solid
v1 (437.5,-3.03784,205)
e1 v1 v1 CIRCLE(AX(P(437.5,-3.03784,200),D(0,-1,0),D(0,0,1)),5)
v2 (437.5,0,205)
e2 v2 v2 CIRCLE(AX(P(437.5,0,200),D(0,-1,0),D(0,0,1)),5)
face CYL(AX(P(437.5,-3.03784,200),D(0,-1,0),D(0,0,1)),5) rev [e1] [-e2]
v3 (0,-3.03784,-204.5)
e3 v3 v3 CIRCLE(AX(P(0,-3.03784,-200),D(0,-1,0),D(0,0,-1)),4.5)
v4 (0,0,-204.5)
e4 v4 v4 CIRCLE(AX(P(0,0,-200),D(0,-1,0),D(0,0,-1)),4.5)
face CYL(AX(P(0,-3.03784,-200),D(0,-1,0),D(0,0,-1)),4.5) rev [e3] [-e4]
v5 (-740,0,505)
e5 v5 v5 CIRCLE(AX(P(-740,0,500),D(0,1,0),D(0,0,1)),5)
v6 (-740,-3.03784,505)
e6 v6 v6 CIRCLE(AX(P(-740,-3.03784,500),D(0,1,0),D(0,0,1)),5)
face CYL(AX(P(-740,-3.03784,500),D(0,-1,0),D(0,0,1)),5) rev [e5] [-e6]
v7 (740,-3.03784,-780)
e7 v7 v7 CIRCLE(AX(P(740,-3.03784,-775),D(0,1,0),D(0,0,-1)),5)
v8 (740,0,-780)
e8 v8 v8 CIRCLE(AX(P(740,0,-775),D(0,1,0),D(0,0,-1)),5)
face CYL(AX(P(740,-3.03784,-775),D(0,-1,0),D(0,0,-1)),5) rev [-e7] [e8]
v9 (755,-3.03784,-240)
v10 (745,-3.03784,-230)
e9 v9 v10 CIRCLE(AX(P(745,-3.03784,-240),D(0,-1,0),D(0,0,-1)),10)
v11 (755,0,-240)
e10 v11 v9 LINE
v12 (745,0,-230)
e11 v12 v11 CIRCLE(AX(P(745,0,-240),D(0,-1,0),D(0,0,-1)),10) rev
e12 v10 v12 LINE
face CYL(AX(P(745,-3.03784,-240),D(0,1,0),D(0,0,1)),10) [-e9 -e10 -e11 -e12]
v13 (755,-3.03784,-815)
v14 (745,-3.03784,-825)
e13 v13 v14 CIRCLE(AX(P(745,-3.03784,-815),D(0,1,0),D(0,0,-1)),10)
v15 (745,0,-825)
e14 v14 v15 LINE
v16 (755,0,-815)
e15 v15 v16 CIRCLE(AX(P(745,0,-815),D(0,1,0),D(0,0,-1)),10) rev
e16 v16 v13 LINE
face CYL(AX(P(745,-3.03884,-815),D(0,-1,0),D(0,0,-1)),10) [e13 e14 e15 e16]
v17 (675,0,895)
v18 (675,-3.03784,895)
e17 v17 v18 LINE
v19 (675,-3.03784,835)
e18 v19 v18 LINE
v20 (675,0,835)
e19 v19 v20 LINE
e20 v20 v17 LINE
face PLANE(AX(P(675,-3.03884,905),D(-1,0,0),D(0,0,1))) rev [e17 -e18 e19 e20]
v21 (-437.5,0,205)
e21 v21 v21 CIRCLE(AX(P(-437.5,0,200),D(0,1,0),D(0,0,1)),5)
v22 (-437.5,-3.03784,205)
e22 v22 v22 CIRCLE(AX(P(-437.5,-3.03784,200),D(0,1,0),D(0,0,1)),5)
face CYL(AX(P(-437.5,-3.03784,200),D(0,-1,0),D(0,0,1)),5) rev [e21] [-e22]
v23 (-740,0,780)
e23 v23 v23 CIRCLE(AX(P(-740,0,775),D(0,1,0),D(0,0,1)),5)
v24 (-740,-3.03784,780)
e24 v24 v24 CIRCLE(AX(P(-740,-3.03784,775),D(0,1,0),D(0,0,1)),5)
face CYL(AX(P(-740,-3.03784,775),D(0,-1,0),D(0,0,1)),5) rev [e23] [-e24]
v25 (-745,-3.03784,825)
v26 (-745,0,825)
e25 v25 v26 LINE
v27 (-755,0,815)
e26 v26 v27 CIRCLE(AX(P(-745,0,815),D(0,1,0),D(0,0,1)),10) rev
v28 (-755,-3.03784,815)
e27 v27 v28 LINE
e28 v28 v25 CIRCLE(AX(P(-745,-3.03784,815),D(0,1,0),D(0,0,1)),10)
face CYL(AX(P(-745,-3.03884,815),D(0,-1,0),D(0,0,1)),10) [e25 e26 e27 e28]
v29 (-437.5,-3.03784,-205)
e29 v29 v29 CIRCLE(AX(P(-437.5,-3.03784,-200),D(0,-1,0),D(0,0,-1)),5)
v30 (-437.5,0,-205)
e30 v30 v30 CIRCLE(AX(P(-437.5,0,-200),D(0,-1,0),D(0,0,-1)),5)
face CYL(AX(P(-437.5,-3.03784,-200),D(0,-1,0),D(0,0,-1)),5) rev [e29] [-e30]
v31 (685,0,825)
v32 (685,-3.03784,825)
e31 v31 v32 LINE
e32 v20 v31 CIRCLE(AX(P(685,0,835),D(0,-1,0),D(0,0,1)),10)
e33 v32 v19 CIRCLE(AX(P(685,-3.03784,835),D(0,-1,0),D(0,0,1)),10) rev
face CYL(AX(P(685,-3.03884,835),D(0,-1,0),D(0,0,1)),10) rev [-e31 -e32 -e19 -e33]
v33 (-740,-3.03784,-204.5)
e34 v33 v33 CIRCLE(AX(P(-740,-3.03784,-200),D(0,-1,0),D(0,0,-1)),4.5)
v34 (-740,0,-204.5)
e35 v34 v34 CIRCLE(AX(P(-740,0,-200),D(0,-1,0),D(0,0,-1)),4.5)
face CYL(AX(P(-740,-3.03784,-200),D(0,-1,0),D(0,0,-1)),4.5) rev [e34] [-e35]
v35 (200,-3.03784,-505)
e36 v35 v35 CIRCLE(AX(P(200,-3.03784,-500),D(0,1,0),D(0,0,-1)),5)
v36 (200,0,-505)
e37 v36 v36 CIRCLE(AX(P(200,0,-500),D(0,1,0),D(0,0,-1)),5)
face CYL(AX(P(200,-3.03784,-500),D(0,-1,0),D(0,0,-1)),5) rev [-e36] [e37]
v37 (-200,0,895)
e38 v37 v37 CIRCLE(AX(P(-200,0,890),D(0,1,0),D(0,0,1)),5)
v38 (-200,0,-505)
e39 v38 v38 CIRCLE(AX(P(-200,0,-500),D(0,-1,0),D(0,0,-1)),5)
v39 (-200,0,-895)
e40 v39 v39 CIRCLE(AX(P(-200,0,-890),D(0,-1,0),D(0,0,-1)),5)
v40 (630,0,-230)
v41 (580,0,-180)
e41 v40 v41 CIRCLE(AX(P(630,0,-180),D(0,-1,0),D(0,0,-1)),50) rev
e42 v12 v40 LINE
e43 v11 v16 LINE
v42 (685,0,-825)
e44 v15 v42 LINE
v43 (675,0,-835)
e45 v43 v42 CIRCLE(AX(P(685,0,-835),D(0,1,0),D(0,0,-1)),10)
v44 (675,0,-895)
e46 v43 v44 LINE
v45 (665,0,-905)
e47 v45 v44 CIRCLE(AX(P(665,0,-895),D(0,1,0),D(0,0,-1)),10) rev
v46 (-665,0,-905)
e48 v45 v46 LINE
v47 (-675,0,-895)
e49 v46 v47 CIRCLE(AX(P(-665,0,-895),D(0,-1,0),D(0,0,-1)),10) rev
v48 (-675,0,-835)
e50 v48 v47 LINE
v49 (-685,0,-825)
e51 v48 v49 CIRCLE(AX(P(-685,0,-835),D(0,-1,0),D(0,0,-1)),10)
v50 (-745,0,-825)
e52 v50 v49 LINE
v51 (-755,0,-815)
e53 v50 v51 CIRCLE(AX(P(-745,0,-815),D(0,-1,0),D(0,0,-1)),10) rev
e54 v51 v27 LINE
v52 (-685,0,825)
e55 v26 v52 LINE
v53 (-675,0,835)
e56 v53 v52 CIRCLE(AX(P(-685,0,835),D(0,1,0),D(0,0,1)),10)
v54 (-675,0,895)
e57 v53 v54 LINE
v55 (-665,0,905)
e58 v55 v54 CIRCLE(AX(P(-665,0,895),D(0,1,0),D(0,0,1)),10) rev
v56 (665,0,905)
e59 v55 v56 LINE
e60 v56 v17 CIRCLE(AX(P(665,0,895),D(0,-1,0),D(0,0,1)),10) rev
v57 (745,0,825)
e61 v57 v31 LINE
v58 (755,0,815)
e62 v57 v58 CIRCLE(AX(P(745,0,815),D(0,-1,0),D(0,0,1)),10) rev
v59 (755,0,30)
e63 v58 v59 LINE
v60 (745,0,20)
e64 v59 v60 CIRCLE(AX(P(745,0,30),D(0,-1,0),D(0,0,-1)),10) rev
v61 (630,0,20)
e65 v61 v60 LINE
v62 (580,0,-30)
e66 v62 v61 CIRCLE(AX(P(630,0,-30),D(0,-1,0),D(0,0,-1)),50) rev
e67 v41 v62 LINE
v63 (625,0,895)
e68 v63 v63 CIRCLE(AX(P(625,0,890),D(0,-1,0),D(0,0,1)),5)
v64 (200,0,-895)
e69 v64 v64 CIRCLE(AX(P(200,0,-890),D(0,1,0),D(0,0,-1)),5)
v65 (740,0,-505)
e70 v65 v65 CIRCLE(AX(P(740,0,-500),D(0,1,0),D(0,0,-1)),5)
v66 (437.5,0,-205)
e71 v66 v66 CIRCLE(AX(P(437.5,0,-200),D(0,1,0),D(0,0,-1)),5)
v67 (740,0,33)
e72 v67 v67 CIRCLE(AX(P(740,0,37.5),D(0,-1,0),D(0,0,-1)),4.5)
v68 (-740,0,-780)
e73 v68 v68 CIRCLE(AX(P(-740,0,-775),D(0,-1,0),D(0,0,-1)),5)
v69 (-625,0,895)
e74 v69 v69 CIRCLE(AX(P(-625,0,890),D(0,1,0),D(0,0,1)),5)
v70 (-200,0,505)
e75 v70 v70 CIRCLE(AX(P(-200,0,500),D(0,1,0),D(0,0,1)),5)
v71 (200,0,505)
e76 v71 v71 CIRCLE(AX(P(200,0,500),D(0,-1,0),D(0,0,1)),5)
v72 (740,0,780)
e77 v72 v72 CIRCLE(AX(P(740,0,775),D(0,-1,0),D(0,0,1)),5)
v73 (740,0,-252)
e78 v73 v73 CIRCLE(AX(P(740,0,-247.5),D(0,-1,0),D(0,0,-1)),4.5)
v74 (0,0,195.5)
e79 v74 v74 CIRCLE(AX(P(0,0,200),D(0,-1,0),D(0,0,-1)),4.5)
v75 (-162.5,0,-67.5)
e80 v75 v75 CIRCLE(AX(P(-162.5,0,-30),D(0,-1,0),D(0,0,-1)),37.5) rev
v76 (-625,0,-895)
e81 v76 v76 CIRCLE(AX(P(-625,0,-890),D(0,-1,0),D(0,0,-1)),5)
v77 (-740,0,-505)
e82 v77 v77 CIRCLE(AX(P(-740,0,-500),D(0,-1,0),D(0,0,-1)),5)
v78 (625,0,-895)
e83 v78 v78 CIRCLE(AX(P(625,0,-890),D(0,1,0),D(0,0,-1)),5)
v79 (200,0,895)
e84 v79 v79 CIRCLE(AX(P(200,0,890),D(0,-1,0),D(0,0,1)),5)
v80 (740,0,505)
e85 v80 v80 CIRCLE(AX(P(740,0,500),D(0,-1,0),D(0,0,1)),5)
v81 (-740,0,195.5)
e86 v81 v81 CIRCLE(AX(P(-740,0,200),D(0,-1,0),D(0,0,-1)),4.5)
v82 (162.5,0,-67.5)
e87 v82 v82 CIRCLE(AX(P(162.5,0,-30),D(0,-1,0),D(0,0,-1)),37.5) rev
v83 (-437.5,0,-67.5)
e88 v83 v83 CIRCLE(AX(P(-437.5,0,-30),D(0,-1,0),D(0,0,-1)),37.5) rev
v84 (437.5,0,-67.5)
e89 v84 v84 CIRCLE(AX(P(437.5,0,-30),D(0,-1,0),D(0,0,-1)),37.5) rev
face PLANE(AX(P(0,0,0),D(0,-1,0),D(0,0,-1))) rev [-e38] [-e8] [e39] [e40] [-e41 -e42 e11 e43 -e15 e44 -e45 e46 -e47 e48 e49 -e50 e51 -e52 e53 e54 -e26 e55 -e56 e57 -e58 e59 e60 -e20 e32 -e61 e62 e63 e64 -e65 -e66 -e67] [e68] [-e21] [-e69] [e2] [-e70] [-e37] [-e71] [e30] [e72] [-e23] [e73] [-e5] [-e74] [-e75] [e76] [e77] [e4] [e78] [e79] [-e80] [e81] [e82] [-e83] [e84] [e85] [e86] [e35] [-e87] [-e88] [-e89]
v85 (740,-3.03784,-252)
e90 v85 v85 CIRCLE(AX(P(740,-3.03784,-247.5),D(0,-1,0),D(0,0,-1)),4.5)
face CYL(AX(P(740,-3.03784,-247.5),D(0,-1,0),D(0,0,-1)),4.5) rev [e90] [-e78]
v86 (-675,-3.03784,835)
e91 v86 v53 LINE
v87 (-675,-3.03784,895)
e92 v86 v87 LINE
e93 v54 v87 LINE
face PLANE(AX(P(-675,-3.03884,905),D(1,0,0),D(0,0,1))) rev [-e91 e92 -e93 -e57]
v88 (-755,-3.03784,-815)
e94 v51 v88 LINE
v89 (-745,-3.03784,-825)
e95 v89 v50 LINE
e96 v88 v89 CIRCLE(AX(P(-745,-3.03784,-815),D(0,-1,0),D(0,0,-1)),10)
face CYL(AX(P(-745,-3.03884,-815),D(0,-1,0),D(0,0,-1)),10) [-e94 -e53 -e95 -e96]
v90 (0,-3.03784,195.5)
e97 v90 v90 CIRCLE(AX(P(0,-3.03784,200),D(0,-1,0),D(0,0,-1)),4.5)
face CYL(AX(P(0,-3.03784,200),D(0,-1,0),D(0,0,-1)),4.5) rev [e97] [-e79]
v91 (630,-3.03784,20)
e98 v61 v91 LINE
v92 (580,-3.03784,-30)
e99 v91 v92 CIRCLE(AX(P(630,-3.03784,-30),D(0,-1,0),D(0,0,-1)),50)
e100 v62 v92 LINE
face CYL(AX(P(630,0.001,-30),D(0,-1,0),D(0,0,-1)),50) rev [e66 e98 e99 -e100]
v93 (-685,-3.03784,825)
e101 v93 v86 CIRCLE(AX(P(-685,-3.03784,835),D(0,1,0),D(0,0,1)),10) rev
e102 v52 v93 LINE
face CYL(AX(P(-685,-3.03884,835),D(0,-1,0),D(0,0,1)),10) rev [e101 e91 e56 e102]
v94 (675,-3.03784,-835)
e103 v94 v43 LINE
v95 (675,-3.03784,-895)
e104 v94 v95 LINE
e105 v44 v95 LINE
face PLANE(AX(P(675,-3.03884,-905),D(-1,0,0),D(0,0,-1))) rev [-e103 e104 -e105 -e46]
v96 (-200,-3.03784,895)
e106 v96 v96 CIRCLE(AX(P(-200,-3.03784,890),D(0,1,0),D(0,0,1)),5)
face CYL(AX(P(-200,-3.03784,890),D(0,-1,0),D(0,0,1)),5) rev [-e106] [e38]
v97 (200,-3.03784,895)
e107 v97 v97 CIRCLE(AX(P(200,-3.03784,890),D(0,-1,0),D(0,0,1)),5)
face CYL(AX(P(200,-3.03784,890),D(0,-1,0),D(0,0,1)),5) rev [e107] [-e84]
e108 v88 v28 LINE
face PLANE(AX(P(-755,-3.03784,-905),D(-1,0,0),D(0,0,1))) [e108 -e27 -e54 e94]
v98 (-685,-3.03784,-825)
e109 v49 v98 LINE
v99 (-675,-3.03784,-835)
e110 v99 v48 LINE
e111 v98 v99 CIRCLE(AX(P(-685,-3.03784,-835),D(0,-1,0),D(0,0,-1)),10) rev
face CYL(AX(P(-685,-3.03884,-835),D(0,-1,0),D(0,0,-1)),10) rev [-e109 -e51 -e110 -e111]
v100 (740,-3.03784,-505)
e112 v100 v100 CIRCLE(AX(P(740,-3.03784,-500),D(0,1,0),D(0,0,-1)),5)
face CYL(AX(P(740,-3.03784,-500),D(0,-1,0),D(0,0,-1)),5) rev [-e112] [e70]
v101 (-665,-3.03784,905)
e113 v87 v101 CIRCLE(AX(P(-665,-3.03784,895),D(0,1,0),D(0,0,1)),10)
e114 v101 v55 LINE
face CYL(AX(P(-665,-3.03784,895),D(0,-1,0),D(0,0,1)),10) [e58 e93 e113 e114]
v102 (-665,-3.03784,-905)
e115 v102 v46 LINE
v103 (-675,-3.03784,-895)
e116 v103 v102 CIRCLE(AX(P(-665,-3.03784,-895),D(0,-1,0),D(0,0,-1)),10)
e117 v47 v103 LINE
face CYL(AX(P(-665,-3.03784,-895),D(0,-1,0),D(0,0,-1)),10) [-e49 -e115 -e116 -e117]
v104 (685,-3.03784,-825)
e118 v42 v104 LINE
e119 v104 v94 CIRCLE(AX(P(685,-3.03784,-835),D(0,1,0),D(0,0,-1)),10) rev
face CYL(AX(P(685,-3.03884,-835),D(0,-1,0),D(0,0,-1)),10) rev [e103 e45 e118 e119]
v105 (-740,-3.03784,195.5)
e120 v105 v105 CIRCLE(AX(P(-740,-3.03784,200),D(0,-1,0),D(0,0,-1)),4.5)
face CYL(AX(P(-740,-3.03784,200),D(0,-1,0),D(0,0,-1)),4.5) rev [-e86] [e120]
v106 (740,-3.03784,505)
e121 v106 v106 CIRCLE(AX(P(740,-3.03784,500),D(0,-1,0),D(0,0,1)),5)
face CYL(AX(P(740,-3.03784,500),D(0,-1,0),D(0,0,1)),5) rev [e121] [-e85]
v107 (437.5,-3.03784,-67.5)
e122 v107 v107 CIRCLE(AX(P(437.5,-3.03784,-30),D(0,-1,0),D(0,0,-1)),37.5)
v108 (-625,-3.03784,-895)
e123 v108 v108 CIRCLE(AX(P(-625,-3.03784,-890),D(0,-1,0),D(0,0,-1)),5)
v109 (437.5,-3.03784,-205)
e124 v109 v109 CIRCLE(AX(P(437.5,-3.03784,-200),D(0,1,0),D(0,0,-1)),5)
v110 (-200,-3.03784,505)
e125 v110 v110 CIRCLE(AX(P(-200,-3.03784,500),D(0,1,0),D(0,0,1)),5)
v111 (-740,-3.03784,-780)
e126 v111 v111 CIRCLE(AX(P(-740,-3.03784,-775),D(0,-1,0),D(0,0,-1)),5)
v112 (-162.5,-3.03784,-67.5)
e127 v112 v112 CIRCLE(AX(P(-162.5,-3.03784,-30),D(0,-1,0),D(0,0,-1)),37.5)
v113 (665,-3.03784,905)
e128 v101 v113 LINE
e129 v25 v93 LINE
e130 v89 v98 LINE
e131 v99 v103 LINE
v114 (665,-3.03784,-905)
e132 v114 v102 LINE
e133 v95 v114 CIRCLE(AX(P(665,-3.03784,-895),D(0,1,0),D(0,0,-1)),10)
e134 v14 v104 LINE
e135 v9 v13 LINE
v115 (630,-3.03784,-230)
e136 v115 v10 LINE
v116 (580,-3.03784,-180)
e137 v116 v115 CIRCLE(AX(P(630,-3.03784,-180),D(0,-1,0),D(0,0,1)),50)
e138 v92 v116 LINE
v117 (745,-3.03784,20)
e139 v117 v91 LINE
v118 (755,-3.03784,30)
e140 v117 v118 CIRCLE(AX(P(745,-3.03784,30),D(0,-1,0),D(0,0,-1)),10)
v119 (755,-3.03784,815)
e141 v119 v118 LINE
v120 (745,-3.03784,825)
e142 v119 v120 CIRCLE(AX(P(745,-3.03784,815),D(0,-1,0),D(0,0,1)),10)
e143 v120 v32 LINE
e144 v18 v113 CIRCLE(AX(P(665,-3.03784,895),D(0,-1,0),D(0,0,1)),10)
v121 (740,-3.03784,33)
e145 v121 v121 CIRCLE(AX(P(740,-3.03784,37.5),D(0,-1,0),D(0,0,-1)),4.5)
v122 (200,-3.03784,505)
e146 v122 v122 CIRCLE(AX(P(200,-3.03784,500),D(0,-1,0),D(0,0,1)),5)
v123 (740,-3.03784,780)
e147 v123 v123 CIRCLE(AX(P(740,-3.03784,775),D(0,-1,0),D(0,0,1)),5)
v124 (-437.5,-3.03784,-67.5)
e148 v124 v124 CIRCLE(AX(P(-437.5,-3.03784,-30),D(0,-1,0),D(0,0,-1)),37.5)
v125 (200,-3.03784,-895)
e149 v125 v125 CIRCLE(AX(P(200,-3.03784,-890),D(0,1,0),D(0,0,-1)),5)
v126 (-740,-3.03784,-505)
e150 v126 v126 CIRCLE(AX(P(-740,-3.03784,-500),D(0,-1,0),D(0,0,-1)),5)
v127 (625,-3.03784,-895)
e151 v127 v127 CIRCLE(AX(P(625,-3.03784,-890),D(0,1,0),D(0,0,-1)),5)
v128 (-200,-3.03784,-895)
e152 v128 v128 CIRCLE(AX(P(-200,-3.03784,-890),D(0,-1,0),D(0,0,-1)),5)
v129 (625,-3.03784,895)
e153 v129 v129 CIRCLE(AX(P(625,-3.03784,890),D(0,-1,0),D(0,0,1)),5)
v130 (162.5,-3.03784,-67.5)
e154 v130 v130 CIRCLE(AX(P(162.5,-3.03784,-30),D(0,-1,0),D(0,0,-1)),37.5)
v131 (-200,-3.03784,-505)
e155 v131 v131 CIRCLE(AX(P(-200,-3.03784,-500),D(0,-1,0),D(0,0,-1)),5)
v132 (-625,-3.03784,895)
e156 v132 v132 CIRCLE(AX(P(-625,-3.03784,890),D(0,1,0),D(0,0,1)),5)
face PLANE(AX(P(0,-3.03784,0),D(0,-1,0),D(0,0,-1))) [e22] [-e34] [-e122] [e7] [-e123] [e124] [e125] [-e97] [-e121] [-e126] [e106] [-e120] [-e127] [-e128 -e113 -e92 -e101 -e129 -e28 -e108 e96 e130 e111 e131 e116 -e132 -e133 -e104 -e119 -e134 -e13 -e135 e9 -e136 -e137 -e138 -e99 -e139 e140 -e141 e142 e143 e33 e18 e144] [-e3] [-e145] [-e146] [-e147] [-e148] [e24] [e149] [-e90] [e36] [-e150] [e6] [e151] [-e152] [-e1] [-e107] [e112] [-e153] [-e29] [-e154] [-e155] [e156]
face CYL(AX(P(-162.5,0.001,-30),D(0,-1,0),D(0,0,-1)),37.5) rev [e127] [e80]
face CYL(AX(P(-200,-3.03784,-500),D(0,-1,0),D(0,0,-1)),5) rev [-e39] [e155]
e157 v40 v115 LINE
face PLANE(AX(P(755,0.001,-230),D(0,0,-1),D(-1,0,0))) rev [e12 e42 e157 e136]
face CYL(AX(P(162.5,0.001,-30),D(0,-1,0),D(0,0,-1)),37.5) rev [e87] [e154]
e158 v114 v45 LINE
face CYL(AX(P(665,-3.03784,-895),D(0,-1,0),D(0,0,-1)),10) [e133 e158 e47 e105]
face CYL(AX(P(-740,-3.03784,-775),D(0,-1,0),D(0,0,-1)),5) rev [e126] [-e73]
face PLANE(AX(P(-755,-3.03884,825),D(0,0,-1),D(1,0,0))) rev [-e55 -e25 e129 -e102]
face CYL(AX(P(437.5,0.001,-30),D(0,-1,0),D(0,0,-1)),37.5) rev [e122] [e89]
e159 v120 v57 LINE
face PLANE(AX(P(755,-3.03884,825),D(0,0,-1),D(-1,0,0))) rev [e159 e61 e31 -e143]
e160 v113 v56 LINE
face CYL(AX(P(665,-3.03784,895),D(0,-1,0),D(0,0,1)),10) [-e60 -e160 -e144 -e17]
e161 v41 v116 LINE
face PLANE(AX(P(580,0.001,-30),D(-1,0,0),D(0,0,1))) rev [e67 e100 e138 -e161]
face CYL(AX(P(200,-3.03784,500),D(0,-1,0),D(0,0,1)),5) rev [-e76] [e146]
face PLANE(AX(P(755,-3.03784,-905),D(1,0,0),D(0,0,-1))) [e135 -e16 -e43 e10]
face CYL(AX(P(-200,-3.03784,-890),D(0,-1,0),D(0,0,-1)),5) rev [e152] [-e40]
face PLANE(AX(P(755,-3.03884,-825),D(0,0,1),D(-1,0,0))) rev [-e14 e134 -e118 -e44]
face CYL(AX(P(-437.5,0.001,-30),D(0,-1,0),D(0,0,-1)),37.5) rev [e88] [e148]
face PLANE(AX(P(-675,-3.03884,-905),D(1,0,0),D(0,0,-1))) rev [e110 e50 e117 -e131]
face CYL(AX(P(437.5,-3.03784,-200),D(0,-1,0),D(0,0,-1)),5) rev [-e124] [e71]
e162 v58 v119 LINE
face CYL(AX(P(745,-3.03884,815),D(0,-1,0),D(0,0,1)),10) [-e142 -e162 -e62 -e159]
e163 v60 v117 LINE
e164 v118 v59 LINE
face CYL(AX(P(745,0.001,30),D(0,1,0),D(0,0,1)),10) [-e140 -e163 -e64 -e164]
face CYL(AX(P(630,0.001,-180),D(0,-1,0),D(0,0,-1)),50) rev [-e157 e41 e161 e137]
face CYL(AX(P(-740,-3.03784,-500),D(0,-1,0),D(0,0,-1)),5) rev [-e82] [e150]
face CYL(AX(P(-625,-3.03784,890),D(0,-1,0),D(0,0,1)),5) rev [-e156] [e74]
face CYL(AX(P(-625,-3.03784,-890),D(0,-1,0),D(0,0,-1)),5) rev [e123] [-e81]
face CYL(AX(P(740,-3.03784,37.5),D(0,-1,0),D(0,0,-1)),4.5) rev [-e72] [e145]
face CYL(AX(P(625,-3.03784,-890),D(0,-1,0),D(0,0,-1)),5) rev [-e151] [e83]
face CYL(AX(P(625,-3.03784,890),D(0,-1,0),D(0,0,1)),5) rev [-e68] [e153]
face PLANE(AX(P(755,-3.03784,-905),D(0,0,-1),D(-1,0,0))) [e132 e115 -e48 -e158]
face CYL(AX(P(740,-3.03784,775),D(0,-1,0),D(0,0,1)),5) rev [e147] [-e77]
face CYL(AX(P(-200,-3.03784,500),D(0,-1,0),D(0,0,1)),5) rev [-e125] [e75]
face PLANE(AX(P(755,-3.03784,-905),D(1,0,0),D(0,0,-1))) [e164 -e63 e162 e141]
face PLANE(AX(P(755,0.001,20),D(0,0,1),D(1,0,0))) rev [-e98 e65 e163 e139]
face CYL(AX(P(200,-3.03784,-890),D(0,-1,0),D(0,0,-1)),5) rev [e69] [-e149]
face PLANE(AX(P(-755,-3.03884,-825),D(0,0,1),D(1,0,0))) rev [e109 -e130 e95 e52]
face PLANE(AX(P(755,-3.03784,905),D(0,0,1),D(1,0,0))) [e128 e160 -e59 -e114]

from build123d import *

# Parameters (mm, degrees)
SKETCH1_W            = 1510
SKETCH1_H            = 1810
BASE_FLANGE1_DEPTH   = 3.03784
CUT_EXTRUDE1_REACH   = 1180.584
SKETCH6_W            = 80
SKETCH6_H            = 80
M8_CLEARANCE_HOLE1_D = 10
FILLET1_R            = 10
FILLET1_OF_MIRROR1_R = 10
MIRROR2_START        = -3.03784
MIRROR2_OUTLINE_R    = 5
MIRROR2_DEPTH        = 3.03784
CUT_EXTRUDE2_REACH   = 1180.584
SKETCH12_R           = 37.5
M8_CLEARANCE_HOLE2_D = 9
FILLET2_R            = 10


# Read off the part's stored shape, not the designer's step: Mirror2
# Sheet-metal steps are written as plain solids
with BuildPart() as part:
    # Sketch1 → Base-Flange1 (new body)
    with BuildSketch(Plane(origin=(0, 0, 0), x_dir=(1, 0, 0), z_dir=(0, 1, 0))):
        Rectangle(SKETCH1_W, SKETCH1_H)
    extrude(amount=-BASE_FLANGE1_DEPTH)

    # Sketch6 → Cut-Extrude1 (cut, up to next)
    with BuildSketch(Plane(origin=(0, 0, 0), x_dir=(1, 0, 0), z_dir=(0, 1, 0)), mode=Mode.PRIVATE) as cut_extrude1_sk1:
        with Locations((-715, 865)):
            Rectangle(SKETCH6_W, SKETCH6_H)
    cut_extrude1_tool1 = extrude(cut_extrude1_sk1.sketch, amount=-CUT_EXTRUDE1_REACH, mode=Mode.PRIVATE) & part.part
    cut_extrude1 = cut_extrude1_tool1.solids().sort_by_distance((-715, 0, -865))[0]
    add(cut_extrude1, mode=Mode.SUBTRACT)

    # M8 Clearance Hole1 (through all)
    with Locations(Plane(origin=(0, -3.03784, 0), x_dir=(-1, 0, 0), z_dir=(0, -1, 0))):
        with Locations((200, 890), (200, 500), (740, 500), (740, 775), (625, 890), (437.5, 200)):
            m8_clearance_hole1 = Hole(M8_CLEARANCE_HOLE1_D / 2)

    # Fillet1
    fillet1_edges = [part.edges().sort_by_distance(p)[0] for p in [
        (-755, -1.51892, -825),
        (-675, -1.51892, -905),
        (-675, -1.51892, -825),
    ]]
    fillet(fillet1_edges, radius=FILLET1_R)

    # Mirror1: Cut-Extrude1, M8 Clearance Hole1 across plane
    add(cut_extrude1.mirror(Plane.XY), mode=Mode.SUBTRACT)
    add(m8_clearance_hole1.mirror(Plane.XY), mode=Mode.SUBTRACT)

    # Fillet1 of Mirror1
    fillet1_of_mirror1_edges = [part.edges().sort_by_distance(p)[0] for p in [
        (-755, -1.51892, 825),
        (-675, -1.51892, 905),
        (-675, -1.51892, 825),
    ]]
    fillet(fillet1_of_mirror1_edges, radius=FILLET1_OF_MIRROR1_R)

    # Mirror2 outline → Mirror2 (cut)
    with BuildSketch(Plane(origin=(0, 0, 0), x_dir=(1, 0, 0), z_dir=(0, 1, 0)).offset(MIRROR2_START)):
        with BuildLine():
            ThreePointArc((675, 835), (677.928932188, 827.928932188), (685, 825))
            Line((685, 825), (745, 825))
            ThreePointArc((745, 825), (752.071067812, 822.071067812), (755, 815))
            Line((755, 815), (755, 905))
            Line((755, 905), (665, 905))
            ThreePointArc((665, 905), (672.071067812, 902.071067812), (675, 895))
            Line((675, 895), (675, 835))
        make_face()
        with BuildLine():
            Line((755, -905), (755, -815))
            ThreePointArc((755, -815), (752.071067812, -822.071067812), (745, -825))
            Line((745, -825), (685, -825))
            ThreePointArc((685, -825), (677.928932188, -827.928932188), (675, -835))
            Line((675, -835), (675, -895))
            ThreePointArc((675, -895), (672.071067812, -902.071067812), (665, -905))
            Line((665, -905), (755, -905))
        make_face()
        with Locations((200, -890)):
            Circle(MIRROR2_OUTLINE_R)
        with Locations((200, 890)):
            Circle(MIRROR2_OUTLINE_R)
        with Locations((437.5, -200)):
            Circle(MIRROR2_OUTLINE_R)
        with Locations((437.5, 200)):
            Circle(MIRROR2_OUTLINE_R)
        with Locations((625, -890)):
            Circle(MIRROR2_OUTLINE_R)
        with Locations((625, 890)):
            Circle(MIRROR2_OUTLINE_R)
        with Locations((740, -775)):
            Circle(MIRROR2_OUTLINE_R)
        with Locations((740, 775)):
            Circle(MIRROR2_OUTLINE_R)
        with Locations((740, -500)):
            Circle(MIRROR2_OUTLINE_R)
        with Locations((740, 500)):
            Circle(MIRROR2_OUTLINE_R)
        with Locations((200, -500)):
            Circle(MIRROR2_OUTLINE_R)
        with Locations((200, 500)):
            Circle(MIRROR2_OUTLINE_R)
    extrude(amount=MIRROR2_DEPTH, mode=Mode.SUBTRACT)

    # Sketch12 → Cut-Extrude2 (cut, up to next)
    with BuildSketch(Plane.XZ.offset(3.03784), mode=Mode.PRIVATE) as cut_extrude2_sk1:
        with Locations(Location((-437.5, -30, 0), (0, 0, 270))):
            Circle(SKETCH12_R)
    cut_extrude2_tool1 = extrude(cut_extrude2_sk1.sketch, amount=-CUT_EXTRUDE2_REACH, mode=Mode.PRIVATE) & part.part
    # Sketch12 → Cut-Extrude2 (cut, up to next)
    with BuildSketch(Plane.XZ.offset(3.03784), mode=Mode.PRIVATE) as cut_extrude2_sk2:
        with Locations(Location((-162.5, -30, 0), (0, 0, 270))):
            Circle(SKETCH12_R)
    cut_extrude2_tool2 = extrude(cut_extrude2_sk2.sketch, amount=-CUT_EXTRUDE2_REACH, mode=Mode.PRIVATE) & part.part
    # Sketch12 → Cut-Extrude2 (cut, up to next)
    with BuildSketch(Plane.XZ.offset(3.03784), mode=Mode.PRIVATE) as cut_extrude2_sk3:
        with Locations(Location((162.5, -30, 0), (0, 0, 270))):
            Circle(SKETCH12_R)
    cut_extrude2_tool3 = extrude(cut_extrude2_sk3.sketch, amount=-CUT_EXTRUDE2_REACH, mode=Mode.PRIVATE) & part.part
    # Sketch12 → Cut-Extrude2 (cut, up to next)
    with BuildSketch(Plane.XZ.offset(3.03784), mode=Mode.PRIVATE) as cut_extrude2_sk4:
        with Locations(Location((437.5, -30, 0), (0, 0, 270))):
            Circle(SKETCH12_R)
    cut_extrude2_tool4 = extrude(cut_extrude2_sk4.sketch, amount=-CUT_EXTRUDE2_REACH, mode=Mode.PRIVATE) & part.part
    # Sketch12 → Cut-Extrude2 (cut, up to next)
    with BuildSketch(Plane.XZ.offset(3.03784), mode=Mode.PRIVATE) as cut_extrude2_sk5:
        with BuildLine():
            Line((755, 20), (630, 20))
            ThreePointArc((630, 20), (594.644660941, 5.355339059), (580, -30))
            Line((580, -30), (580, -180))
            ThreePointArc((580, -180), (594.644660941, -215.355339059), (630, -230))
            Line((630, -230), (755, -230))
            Line((755, -230), (755, 20))
        make_face()
    cut_extrude2_tool5 = extrude(cut_extrude2_sk5.sketch, amount=-CUT_EXTRUDE2_REACH, mode=Mode.PRIVATE) & part.part
    add(cut_extrude2_tool1.solids().sort_by_distance((-437.5, -3.03784, -30))[0], mode=Mode.SUBTRACT)
    add(cut_extrude2_tool2.solids().sort_by_distance((-162.5, -3.03784, -30))[0], mode=Mode.SUBTRACT)
    add(cut_extrude2_tool3.solids().sort_by_distance((162.5, -3.03784, -30))[0], mode=Mode.SUBTRACT)
    add(cut_extrude2_tool4.solids().sort_by_distance((437.5, -3.03784, -30))[0], mode=Mode.SUBTRACT)
    add(cut_extrude2_tool5.solids().sort_by_distance((669.419173, -3.03784, -105))[0], mode=Mode.SUBTRACT)

    # M8 Clearance Hole2 (through all)
    with Locations(Plane(origin=(0, -3.03784, 0), x_dir=(-1, 0, 0), z_dir=(0, -1, 0))):
        with Locations((-740, -37.5), (-740, 247.5), (740, 200), (740, -200), (0, 200), (0, -200)):
            Hole(M8_CLEARANCE_HOLE2_D / 2)

    # Fillet2
    fillet2_edges = [part.edges().sort_by_distance(p)[0] for p in [
        (755, -1.51892, 20),
        (755, -1.51892, -230),
    ]]
    fillet(fillet2_edges, radius=FILLET2_R)


solid = part.part
